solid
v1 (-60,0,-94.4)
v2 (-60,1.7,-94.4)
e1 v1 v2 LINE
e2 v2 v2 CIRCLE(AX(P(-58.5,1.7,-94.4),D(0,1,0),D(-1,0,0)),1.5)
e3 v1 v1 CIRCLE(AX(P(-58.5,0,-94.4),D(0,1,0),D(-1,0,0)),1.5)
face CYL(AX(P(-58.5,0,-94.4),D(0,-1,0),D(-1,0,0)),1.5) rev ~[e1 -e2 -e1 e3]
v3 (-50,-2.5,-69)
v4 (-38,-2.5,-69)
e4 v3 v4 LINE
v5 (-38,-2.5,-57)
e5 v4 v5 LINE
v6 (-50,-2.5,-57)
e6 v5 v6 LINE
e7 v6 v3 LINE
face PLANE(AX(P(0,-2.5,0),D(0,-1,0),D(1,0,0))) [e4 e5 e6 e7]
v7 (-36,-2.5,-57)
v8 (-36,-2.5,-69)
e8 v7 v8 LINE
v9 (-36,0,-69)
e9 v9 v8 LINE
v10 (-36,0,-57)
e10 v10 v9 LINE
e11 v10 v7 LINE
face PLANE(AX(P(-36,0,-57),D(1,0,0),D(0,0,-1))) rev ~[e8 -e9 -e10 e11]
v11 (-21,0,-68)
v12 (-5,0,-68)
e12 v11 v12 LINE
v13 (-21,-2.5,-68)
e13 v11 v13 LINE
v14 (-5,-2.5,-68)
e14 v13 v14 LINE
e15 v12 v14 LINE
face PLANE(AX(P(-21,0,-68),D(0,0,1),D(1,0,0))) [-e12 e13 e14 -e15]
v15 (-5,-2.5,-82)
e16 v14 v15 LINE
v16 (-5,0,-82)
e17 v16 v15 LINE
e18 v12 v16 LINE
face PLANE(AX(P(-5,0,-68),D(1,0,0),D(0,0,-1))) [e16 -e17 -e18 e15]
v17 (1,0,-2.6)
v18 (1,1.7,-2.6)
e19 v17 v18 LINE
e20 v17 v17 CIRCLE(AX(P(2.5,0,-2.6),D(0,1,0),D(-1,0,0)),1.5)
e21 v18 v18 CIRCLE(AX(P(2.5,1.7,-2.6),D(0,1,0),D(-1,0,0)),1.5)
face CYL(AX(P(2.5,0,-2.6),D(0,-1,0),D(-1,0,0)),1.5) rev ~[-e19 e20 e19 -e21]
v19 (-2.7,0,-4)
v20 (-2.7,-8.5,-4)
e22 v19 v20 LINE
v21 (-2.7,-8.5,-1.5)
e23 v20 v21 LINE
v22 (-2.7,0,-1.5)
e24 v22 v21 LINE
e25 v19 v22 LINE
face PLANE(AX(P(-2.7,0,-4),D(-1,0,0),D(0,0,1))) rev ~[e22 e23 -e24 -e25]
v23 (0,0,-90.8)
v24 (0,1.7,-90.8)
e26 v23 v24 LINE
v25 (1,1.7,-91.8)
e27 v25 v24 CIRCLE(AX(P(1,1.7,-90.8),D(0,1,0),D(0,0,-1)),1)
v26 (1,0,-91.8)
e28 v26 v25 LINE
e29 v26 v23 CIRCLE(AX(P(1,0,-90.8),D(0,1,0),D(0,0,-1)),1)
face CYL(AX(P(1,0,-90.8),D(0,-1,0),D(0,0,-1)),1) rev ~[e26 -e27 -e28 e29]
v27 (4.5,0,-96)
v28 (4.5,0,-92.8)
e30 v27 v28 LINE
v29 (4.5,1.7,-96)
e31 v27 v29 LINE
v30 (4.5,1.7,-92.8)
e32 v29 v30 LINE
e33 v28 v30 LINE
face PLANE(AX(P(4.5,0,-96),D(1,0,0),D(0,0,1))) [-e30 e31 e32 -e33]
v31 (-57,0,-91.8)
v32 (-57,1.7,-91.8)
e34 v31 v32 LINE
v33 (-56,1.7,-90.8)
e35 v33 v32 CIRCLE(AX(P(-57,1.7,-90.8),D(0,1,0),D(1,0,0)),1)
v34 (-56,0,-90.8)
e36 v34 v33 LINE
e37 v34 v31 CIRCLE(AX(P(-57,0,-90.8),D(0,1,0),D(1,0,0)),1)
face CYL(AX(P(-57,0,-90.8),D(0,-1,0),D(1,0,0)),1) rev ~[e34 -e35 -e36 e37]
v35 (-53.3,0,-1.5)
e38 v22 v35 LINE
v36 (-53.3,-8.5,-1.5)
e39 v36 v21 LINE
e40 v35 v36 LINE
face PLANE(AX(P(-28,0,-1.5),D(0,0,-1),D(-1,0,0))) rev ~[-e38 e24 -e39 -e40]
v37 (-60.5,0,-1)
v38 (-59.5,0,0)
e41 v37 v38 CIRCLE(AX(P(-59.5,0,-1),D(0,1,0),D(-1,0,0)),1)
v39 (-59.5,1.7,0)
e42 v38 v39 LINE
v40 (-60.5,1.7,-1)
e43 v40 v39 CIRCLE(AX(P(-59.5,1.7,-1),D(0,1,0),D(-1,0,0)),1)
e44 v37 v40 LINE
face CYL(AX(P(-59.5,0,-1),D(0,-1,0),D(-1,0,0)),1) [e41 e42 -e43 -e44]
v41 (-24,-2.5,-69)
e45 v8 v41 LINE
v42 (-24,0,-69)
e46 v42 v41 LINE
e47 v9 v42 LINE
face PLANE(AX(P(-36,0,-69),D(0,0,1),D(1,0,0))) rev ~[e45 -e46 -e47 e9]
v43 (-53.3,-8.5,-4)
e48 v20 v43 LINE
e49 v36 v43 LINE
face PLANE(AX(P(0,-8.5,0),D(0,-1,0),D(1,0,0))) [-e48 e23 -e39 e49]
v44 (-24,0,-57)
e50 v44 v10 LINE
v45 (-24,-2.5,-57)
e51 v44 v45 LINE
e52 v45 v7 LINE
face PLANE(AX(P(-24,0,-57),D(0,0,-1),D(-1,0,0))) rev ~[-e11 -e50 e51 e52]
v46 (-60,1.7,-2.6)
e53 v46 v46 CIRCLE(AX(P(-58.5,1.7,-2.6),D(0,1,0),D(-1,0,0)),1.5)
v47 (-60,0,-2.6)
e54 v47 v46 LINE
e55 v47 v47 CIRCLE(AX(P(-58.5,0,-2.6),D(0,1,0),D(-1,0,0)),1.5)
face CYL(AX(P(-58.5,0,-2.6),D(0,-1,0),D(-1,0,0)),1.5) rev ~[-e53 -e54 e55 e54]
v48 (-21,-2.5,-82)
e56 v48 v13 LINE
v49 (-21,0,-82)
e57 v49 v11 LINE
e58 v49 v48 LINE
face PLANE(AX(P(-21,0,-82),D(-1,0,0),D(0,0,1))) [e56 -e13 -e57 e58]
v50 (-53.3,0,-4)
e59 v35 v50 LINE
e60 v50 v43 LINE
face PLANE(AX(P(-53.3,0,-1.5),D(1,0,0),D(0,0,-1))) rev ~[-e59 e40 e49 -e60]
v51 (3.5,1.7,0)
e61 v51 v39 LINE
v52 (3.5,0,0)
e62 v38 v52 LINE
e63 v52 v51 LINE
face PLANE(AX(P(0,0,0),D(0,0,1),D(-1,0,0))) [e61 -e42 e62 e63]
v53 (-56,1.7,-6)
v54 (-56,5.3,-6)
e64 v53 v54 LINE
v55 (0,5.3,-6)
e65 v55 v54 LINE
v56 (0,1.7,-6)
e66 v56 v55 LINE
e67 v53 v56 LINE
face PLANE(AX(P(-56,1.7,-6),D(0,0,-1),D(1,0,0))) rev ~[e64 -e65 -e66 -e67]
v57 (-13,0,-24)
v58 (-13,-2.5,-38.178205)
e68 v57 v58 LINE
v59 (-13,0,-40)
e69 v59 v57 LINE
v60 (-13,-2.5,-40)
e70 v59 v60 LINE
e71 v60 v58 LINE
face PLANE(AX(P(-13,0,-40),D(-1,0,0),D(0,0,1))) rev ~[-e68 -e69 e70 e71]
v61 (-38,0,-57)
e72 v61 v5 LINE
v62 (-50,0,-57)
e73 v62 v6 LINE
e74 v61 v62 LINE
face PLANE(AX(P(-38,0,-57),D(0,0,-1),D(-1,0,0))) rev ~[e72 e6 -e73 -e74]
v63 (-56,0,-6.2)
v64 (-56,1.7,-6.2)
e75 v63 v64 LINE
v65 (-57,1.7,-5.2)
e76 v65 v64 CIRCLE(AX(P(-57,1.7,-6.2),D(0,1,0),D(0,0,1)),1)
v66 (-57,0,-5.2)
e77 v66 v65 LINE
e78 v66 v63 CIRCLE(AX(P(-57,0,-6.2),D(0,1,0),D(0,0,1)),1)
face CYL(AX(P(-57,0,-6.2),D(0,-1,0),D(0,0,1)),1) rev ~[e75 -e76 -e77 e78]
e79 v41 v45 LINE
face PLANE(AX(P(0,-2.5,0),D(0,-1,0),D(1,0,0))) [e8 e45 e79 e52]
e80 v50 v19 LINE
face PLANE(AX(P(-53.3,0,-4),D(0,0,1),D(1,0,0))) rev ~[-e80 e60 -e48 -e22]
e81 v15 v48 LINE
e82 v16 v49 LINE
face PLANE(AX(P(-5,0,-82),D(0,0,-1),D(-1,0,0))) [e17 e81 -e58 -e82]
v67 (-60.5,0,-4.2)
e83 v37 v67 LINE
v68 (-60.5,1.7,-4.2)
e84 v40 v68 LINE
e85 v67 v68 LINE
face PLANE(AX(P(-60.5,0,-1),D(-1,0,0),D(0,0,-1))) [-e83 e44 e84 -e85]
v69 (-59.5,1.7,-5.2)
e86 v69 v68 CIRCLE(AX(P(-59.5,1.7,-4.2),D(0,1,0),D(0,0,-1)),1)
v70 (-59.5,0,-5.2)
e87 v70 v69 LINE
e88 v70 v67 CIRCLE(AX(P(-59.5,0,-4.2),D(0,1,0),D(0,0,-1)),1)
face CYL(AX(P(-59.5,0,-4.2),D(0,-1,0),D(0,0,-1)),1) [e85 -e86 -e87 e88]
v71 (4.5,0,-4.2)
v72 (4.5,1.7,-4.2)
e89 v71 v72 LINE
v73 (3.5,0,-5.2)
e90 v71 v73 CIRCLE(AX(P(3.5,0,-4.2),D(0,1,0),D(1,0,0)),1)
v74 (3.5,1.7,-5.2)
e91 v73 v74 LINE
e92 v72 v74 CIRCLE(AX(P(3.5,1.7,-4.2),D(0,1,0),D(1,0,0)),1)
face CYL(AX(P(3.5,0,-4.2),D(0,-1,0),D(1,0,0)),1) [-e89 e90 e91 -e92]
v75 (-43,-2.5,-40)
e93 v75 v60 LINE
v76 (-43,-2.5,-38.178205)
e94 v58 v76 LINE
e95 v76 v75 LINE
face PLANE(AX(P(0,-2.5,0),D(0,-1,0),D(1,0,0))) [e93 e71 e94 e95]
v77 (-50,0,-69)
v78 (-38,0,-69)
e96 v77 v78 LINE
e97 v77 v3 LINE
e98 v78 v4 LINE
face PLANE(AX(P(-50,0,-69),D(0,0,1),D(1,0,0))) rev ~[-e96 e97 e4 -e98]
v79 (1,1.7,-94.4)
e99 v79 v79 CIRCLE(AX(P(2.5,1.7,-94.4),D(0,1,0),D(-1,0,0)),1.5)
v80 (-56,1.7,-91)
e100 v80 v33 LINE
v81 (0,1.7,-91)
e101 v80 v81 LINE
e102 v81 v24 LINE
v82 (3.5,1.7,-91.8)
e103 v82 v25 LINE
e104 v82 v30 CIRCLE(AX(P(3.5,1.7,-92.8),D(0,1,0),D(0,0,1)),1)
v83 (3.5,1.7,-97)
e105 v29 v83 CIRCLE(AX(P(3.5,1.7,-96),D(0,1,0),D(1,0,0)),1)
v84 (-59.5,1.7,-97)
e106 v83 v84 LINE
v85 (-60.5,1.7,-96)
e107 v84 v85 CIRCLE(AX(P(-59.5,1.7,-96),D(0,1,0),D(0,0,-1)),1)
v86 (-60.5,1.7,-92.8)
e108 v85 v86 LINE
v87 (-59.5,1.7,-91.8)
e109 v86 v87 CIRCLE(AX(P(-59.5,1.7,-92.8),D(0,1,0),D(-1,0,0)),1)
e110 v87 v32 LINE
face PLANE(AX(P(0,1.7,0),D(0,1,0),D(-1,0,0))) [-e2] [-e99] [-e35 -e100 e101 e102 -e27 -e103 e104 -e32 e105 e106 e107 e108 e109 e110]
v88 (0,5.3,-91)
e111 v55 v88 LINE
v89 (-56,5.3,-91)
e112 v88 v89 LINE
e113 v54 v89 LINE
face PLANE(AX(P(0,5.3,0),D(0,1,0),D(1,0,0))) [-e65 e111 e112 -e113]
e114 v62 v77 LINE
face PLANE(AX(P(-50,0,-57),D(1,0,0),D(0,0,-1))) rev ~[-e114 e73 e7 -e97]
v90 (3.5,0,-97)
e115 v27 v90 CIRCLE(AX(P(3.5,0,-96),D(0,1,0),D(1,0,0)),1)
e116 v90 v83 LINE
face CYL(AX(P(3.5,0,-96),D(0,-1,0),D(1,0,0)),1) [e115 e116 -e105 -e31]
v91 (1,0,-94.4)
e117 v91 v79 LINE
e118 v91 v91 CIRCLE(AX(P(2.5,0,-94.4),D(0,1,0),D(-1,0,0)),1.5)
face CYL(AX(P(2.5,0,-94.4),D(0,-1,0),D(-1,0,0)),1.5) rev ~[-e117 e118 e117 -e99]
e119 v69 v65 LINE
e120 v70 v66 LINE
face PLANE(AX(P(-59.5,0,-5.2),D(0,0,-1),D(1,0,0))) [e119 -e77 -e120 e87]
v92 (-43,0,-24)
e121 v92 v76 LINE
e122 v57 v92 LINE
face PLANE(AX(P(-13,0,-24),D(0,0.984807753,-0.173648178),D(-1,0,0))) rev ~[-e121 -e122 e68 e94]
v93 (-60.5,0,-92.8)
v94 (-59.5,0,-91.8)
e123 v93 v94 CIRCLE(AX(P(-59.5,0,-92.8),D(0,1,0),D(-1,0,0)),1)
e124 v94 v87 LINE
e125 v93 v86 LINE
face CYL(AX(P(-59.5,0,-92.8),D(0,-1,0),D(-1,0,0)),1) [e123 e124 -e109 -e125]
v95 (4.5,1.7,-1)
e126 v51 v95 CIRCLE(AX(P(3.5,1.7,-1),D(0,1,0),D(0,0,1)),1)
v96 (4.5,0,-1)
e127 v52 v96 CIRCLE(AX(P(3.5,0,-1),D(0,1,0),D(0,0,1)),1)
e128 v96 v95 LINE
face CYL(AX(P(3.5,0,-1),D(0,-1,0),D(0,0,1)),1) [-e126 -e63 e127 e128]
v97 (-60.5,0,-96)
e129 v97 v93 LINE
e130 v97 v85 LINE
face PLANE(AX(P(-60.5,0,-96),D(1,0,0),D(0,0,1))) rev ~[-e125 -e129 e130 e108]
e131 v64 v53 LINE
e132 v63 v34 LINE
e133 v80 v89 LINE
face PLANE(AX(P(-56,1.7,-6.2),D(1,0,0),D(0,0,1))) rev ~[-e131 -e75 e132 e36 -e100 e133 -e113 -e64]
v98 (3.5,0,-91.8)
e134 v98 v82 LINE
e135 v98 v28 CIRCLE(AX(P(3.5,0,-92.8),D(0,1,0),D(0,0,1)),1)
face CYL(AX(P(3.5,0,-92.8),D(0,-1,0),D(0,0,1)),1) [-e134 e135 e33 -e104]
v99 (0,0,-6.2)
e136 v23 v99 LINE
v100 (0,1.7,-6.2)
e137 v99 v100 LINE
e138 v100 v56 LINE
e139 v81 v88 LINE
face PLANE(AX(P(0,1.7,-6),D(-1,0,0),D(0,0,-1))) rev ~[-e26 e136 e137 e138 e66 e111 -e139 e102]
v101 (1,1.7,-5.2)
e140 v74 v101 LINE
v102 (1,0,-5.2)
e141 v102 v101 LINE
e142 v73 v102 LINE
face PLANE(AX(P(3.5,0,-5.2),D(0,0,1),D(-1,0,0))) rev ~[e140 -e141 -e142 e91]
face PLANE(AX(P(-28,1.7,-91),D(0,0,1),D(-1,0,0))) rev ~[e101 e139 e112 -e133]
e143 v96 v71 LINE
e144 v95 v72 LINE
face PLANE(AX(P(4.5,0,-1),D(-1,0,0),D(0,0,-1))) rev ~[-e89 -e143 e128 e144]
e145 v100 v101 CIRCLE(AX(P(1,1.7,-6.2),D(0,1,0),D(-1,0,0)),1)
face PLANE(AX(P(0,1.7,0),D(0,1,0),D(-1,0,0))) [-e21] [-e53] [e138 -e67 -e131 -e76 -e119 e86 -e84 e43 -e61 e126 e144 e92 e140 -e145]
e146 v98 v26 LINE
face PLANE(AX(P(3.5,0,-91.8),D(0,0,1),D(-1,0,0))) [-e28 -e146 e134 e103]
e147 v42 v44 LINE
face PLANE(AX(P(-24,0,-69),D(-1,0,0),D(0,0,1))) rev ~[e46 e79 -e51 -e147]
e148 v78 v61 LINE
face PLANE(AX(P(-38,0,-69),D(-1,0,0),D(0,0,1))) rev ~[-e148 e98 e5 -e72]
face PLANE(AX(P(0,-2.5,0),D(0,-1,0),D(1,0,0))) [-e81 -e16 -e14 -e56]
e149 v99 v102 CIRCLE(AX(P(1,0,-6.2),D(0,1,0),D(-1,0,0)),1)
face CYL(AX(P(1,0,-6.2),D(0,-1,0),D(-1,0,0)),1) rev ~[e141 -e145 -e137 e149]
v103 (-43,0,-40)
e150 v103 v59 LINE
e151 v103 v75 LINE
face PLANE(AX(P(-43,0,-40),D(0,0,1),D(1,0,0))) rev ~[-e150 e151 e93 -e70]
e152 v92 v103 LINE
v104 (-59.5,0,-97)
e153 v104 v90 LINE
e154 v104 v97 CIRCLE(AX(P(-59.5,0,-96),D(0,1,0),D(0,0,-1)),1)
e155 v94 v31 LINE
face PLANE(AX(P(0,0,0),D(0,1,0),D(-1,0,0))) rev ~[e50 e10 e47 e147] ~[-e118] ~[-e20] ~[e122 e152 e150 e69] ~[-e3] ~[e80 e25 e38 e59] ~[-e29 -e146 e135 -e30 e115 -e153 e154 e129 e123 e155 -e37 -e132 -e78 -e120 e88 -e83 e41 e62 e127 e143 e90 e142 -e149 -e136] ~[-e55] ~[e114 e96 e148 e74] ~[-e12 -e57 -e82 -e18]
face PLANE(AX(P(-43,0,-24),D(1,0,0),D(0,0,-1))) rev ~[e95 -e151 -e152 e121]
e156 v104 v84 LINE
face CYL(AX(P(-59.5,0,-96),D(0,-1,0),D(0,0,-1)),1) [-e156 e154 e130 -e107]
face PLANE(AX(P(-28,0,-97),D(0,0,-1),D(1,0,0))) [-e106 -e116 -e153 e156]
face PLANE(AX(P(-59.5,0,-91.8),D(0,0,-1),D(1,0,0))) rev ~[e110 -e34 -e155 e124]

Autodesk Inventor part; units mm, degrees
ref_plane "YZ Plane" through (0, 0, 0) normal (1, 0, 0) x (0, 1, 0)
ref_plane "XZ Plane" through (0, 0, 0) normal (0, 1, 0) x (-1, 0, 0)
ref_plane "XY Plane" through (0, 0, 0) normal (0, 0, 1) x (1, 0, 0)
sketch "Sketch1" plane through (0, 0, 0) normal (0, 1, 0) x (-1, 0, 0)
  line L0 (0, 0) -> (56, 0)
  line L1 (56, -6.2) -> (56, -90.8)
  line L2 (56, -97) -> (0, -97)
  line L3 (0, -90.8) -> (0, -6.2)
  line L4 (0, 0) -> (-3.5, 0)
  line L5 (-4.5, -1) -> (-4.5, -4.2)
  line L6 (-3.5, -5.2) -> (-1, -5.2)
  line L7 (28, 0) -> (28, -97)
  circle A0 centre (-2.5, -2.6) radius 1.5
  arc A1 (-3.5, 0) -> (-4.5, -1) centre (-3.5, -1) ccw
  arc A2 (-4.5, -4.2) -> (-3.5, -5.2) centre (-3.5, -4.2) ccw
  arc A3 (0, -6.2) -> (-1, -5.2) centre (-1, -6.2) ccw
  line L8 (56, 0) -> (59.5, 0)
  line L9 (60.5, -1) -> (60.5, -4.2)
  line L10 (59.5, -5.2) -> (57, -5.2)
  circle A4 centre (58.5, -2.6) radius 1.5
  arc A5 (60.5, -1) -> (59.5, 0) centre (59.5, -1) ccw
  arc A6 (59.5, -5.2) -> (60.5, -4.2) centre (59.5, -4.2) ccw
  arc A7 (57, -5.2) -> (56, -6.2) centre (57, -6.2) ccw
  line L11 (56, -48.5) -> (0, -48.5)
  line L12 (0, -97) -> (-3.5, -97)
  line L13 (-4.5, -96) -> (-4.5, -92.8)
  line L14 (-3.5, -91.8) -> (-1, -91.8)
  circle A8 centre (-2.5, -94.4) radius 1.5
  arc A9 (-4.5, -96) -> (-3.5, -97) centre (-3.5, -96) ccw
  arc A10 (-3.5, -91.8) -> (-4.5, -92.8) centre (-3.5, -92.8) ccw
  arc A11 (-1, -91.8) -> (0, -90.8) centre (-1, -90.8) ccw
  arc A12 (56, -90.8) -> (57, -91.8) centre (57, -90.8) ccw
  line L15 (59.5, -91.8) -> (57, -91.8)
  line L16 (56, -97) -> (59.5, -97)
  circle A13 centre (58.5, -94.4) radius 1.5
  arc A14 (60.5, -92.8) -> (59.5, -91.8) centre (59.5, -92.8) ccw
  line L17 (60.5, -96) -> (60.5, -92.8)
  arc A15 (59.5, -97) -> (60.5, -96) centre (59.5, -96) ccw
  point P0 (-4.5, 0)
  point P1 (-4.5, -5.2)
  point P2 (0, -5.2)
  point P3 (60.5, 0)
  point P4 (60.5, -5.2)
  point P5 (56, -5.2)
  point P6 (-4.5, -97)
  point P7 (-4.5, -91.8)
  point P8 (0, -91.8)
  point P9 (56, -91.8)
  point P10 (60.5, -91.8)
  point P11 (60.5, -97)
  dimension "d0" = 56
  dimension "d1" = 97
  dimension "d2" = 4.5
  dimension "d3" = 5.2
  dimension "d10" = 1
  dimension "d11" = 1
  dimension "d12" = 2
  dimension "d13" = 2.6
  dimension "d14" = 3
  dimension "d15" = 56
extrude "Vetronite" add sketch "Sketch1" along normal blind 1.7
sketch "Sketch2" plane through (0, 1.7, 0) normal (0, 1, 0) x (1, 0, 0)
  line L0 (-59.5, 0) -> (3.5, 0) projected
  line L1 (-28, 0) -> (-28, 97)
  line L2 (3.5, 97) -> (-59.5, 97) projected
  line L3 (-56, 90.8) -> (-56, 6.2) projected
  line L4 (-56, 48.5) -> (0, 48.5)
  line L5 (0, 6.2) -> (0, 90.8) projected
  line L6 (-56, 6) -> (0, 6)
  line L7 (0, 6) -> (0, 91)
  line L8 (0, 91) -> (-56, 91)
  line L9 (-56, 91) -> (-56, 6)
  point P0 (0, 0)
  point P1 (-56, 6.2)
  dimension "d16" = 85
  dimension "d17" = 56
extrude "Display" add sketch "Sketch2" along normal blind 3.6
sketch "Sketch3" plane through (0, 0, 0) normal (0, -1, 0) x (1, 0, 0)
  line L0 (-53.3, -4) -> (-2.7, -4)
  line L1 (-2.7, -4) -> (-2.7, -1.5)
  line L2 (-2.7, -1.5) -> (-53.3, -1.5)
  line L3 (-53.3, -1.5) -> (-53.3, -4)
  line L4 (-59.5, 0) -> (3.5, 0) projected
  line L5 (3.5, -97) -> (-59.5, -97) projected
  line L6 (-28, -97) -> (-28, 0)
  line L7 (-59.5, 0) -> (3.5, 0) projected
  point P0 (0, 0)
  dimension "d20" = 50.6
  dimension "d21" = 2.5
  dimension "d22" = 1.5
extrude "Pin" add sketch "Sketch3" along normal blind 8.5
sketch "Sketch4" plane through (0, 0, 0) normal (0, -1, 0) x (1, 0, 0)
  line L0 (-5, -82) -> (-21, -82)
  line L1 (-21, -82) -> (-21, -68)
  line L2 (-21, -68) -> (-5, -68)
  line L3 (-5, -68) -> (-5, -82)
  line L4 (-50, -69) -> (-38, -69)
  line L5 (-38, -69) -> (-38, -57)
  line L6 (-38, -57) -> (-50, -57)
  line L7 (-50, -57) -> (-50, -69)
  line L8 (-36, -69) -> (-24, -69)
  line L9 (-24, -69) -> (-24, -57)
  line L10 (-24, -57) -> (-36, -57)
  line L11 (-36, -57) -> (-36, -69)
  line L12 (-43, -40) -> (-13, -40)
  line L13 (-13, -40) -> (-13, -24)
  line L14 (-13, -24) -> (-43, -24)
  line L15 (-43, -24) -> (-43, -40)
  line L16 (3.5, -97) -> (-59.5, -97) projected
  line L17 (0, -6.2) -> (0, -90.8) projected
  line L18 (-56, -90.8) -> (-56, -6.2) projected
  point P0 (0, 0)
  dimension "d25" = 16
  dimension "d26" = 14
  dimension "d27" = 12
  dimension "d28" = 12
  dimension "d29" = 12
  dimension "d30" = 12
  dimension "d31" = 30
  dimension "d32" = 16
  dimension "d33" = 15
  dimension "d34" = 5
  dimension "d35" = 28
  dimension "d36" = 6
  dimension "d37" = 2
  dimension "d38" = 57
  dimension "d40" = 13
extrude "Componenti" add sketch "Sketch4" along normal blind 2.5
draft "ScreenCables" angle 80 pull direction (0, -1, 0) faces at (-23, -0.8333, -24) fixed edges at (-28, 0, -24)
properties part number "TouchLCD" material "Lead"
